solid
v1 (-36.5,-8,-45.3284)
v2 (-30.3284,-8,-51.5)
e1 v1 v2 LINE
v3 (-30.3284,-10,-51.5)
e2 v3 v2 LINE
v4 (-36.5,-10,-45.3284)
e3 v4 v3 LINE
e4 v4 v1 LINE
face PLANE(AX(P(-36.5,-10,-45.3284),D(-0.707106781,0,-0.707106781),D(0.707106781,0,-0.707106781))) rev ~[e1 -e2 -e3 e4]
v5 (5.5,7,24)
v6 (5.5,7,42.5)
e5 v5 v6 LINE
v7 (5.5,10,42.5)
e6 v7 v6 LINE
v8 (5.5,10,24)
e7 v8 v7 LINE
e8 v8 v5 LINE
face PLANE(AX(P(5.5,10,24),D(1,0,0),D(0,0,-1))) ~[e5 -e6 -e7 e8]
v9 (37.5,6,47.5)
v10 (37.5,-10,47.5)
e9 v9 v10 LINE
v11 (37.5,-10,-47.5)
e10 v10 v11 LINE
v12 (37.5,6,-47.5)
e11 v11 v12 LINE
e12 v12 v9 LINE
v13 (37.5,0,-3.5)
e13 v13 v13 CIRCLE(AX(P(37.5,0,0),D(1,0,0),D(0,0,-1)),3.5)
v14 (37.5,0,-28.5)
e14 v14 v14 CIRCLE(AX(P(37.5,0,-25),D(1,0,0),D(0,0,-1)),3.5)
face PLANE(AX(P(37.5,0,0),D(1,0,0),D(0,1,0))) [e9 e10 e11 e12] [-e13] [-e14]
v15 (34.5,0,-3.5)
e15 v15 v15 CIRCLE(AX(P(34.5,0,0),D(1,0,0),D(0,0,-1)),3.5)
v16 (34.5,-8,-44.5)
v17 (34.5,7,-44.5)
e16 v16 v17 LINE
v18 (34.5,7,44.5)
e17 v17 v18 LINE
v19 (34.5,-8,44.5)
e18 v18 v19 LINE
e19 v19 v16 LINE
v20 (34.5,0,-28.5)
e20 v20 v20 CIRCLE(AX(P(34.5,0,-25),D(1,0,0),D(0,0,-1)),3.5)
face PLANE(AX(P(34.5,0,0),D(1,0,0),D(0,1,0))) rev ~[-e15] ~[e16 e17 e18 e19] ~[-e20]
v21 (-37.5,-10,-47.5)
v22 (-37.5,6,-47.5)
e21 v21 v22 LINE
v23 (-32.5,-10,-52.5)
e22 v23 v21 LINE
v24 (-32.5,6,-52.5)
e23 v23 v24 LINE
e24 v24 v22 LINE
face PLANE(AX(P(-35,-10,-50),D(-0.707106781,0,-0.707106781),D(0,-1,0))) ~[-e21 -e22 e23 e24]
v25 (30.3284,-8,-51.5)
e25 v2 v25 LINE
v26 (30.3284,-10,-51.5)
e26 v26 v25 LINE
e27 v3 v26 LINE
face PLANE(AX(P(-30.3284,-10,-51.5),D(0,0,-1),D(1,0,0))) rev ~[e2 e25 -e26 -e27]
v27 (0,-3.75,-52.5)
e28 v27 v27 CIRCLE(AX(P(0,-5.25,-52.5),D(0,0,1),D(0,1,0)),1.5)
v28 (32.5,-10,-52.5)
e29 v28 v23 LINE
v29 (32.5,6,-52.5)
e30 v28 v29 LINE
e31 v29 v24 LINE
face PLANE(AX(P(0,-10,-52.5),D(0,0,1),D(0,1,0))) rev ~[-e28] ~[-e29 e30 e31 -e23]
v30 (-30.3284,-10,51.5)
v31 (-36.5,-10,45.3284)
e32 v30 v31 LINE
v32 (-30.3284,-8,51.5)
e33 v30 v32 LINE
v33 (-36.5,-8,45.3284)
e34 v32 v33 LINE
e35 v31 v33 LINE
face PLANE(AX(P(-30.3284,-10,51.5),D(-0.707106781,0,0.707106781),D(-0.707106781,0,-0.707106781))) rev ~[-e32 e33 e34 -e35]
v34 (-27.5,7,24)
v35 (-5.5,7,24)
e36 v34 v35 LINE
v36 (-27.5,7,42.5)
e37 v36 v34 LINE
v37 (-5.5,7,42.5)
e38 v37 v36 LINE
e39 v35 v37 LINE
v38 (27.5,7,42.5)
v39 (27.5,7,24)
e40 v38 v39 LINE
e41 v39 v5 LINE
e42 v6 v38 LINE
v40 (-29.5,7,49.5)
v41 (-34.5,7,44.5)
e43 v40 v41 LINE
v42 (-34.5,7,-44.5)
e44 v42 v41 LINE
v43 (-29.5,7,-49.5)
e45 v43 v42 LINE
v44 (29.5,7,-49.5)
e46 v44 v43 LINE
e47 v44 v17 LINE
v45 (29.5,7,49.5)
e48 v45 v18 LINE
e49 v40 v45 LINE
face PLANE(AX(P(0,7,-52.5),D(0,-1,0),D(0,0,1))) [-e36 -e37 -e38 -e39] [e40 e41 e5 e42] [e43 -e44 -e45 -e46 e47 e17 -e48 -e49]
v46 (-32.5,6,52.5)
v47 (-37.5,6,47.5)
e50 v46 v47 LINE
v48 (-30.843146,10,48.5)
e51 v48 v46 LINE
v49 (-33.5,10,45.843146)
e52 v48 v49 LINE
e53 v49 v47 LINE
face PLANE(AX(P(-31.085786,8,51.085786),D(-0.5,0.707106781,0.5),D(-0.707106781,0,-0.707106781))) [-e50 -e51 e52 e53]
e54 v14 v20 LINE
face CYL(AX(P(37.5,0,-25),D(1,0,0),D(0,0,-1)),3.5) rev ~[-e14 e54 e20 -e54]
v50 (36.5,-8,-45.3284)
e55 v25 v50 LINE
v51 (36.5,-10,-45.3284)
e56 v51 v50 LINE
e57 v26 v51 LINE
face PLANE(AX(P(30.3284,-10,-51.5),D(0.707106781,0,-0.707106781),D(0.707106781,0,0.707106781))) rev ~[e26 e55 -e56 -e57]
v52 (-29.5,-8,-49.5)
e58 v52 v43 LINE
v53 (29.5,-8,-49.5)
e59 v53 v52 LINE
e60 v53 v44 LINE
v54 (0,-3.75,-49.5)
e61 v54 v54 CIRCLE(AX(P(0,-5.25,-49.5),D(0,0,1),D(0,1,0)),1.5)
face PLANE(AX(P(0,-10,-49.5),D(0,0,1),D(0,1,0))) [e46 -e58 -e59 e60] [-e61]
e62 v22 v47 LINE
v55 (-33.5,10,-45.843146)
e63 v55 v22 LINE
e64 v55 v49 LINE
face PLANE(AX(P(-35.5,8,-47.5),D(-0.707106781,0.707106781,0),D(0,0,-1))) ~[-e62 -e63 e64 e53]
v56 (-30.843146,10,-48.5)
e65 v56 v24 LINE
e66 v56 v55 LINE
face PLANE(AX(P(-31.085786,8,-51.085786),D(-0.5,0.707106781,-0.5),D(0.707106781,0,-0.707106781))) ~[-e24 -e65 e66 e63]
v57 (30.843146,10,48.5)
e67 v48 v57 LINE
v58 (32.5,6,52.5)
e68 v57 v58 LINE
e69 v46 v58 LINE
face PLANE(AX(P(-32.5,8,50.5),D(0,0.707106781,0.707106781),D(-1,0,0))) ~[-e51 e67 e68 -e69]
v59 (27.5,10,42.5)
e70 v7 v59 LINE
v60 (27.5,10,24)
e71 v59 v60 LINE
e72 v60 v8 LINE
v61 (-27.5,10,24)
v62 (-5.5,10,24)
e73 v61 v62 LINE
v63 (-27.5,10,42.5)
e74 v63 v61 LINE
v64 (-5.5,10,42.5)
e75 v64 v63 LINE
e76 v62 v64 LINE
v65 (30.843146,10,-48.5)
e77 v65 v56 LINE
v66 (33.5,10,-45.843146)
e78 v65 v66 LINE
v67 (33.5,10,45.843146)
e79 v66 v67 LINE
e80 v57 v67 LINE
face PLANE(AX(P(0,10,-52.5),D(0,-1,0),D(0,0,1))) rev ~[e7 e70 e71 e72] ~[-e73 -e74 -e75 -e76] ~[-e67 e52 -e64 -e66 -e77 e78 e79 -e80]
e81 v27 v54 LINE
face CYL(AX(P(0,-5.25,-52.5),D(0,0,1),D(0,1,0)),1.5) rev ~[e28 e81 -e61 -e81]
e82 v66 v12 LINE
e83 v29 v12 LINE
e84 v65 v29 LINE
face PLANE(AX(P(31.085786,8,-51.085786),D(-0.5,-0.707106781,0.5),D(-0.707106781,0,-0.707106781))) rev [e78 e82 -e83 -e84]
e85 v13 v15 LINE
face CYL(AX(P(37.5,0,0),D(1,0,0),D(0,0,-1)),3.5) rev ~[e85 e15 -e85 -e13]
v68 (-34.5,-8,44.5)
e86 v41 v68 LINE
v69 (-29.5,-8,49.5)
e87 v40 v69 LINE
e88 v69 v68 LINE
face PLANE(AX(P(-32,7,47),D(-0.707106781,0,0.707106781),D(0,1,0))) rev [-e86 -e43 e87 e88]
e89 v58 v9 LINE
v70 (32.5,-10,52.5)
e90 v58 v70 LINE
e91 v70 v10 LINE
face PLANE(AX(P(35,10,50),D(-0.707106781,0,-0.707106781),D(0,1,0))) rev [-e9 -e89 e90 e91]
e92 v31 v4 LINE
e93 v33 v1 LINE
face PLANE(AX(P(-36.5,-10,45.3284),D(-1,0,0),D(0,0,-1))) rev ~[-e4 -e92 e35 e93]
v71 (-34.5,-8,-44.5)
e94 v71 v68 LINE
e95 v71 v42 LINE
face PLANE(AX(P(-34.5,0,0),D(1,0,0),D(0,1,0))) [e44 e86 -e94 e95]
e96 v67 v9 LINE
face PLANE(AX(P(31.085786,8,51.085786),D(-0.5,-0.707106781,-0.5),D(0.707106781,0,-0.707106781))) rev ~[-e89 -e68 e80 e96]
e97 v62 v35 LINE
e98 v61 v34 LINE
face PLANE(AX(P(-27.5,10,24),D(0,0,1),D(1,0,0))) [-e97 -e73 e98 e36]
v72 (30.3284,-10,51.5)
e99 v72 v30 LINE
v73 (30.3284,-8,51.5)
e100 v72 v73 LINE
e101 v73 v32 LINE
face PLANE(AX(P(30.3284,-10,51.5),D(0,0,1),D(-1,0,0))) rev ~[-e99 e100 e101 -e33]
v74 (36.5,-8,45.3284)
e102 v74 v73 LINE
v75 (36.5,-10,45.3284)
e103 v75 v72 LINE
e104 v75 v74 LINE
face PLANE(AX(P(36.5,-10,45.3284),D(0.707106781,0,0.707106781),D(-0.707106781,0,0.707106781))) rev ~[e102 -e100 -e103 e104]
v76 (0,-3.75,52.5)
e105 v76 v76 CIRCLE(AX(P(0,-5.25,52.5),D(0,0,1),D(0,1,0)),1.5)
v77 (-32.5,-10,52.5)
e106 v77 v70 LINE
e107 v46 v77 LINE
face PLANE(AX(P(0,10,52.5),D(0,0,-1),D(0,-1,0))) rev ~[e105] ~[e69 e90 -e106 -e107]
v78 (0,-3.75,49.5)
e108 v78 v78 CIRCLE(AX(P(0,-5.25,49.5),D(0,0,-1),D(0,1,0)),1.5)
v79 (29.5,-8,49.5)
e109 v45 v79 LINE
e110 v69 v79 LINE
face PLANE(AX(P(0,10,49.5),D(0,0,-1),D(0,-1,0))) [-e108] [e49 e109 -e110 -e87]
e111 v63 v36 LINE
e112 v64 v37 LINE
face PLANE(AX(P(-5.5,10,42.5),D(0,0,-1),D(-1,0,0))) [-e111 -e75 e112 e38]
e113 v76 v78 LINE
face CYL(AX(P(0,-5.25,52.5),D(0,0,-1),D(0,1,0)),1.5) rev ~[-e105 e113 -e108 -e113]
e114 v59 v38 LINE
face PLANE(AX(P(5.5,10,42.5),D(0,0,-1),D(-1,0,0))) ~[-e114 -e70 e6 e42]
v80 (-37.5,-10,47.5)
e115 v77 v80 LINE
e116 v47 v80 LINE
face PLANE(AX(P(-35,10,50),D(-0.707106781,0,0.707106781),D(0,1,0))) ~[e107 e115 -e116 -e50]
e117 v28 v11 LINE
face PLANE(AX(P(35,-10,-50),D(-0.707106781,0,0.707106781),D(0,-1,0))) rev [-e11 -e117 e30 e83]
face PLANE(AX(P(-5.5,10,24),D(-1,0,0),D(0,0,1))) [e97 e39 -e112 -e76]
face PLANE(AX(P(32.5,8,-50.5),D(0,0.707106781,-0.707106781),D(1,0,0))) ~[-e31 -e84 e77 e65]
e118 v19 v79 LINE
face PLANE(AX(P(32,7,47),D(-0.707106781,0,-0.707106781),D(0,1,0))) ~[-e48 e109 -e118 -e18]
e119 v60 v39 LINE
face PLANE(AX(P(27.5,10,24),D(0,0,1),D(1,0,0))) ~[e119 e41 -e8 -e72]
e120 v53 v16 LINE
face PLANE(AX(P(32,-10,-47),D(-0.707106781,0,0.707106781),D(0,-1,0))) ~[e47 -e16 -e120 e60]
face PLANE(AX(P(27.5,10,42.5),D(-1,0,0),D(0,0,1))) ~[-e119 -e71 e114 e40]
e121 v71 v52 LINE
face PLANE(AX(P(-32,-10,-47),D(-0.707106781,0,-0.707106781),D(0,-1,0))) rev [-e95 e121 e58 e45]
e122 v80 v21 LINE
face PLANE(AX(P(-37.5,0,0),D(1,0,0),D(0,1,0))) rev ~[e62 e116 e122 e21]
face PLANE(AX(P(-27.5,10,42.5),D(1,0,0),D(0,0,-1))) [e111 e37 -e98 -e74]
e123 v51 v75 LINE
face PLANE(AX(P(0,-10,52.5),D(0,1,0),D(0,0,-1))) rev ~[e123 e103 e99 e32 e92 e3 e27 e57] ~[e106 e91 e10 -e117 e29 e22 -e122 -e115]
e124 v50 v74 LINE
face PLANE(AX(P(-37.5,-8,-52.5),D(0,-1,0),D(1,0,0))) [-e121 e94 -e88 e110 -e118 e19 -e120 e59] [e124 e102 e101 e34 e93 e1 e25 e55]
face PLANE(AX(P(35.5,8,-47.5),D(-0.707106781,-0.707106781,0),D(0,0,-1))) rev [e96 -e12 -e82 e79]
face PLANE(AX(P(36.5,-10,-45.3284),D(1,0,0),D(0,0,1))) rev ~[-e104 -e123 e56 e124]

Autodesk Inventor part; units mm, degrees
ref_plane "YZ Plane" through (0, 0, 0) normal (1, 0, 0) x (0, 1, 0)
ref_plane "XZ Plane" through (0, 0, 0) normal (0, 1, 0) x (-1, 0, 0)
ref_plane "XY Plane" through (0, 0, 0) normal (0, 0, 1) x (1, 0, 0)
sketch "Sketch5" plane through (0, 0, 0) normal (1, 0, 0) x (0, 1, 0)
  line L0 (10, 52.5) -> (-10, 52.5)
  line L1 (-10, 52.5) -> (-10, -52.5)
  line L2 (-10, -52.5) -> (10, -52.5)
  line L3 (10, -52.5) -> (10, 52.5)
  point P0 (0, 0)
  point P1 (10, 0)
  point P2 (0, -52.5)
  dimension "d6" = 20
  dimension "d30" = 105
extrude "Extrusion2" add sketch "Sketch5" along normal mid plane 75
shell "Shell1" thickness 3 removed faces 1 at (-12.5, -10, 17.5)
chamfer "Chamfer4" distance 5 angle 45 8 edges at (37.5, 0, 52.5) (34.5, -1.5, 49.5) (34.5, -1.5, -49.5) (37.5, 0, -52.5) (-37.5, 0, -52.5) (-34.5, -1.5, -49.5) (-37.5, 0, 52.5) (-34.5, -1.5, 49.5)
sketch "Sketch7" plane through (-37.5, -10, -52.5) normal (0, -1, 0) x (1, 0, 0)
  line L0 (3, 8) -> (3, 97) projected
  line L1 (8, 102) -> (67, 102) projected
  line L2 (72, 97) -> (72, 8) projected
  line L3 (67, 3) -> (8, 3) projected
  line L4 (5, 0) -> (70, 0) projected
  line L5 (75, 100) -> (75, 5) projected
  line L6 (5, 105) -> (70, 105) projected
  line L7 (0, 5) -> (0, 100) projected
  line L8 (8, 102) -> (3, 97) projected
  line L9 (72, 97) -> (67, 102) projected
  line L10 (67, 3) -> (72, 8) projected
  line L11 (3, 8) -> (8, 3) projected
  line L12 (0, 100) -> (5, 105) projected
  line L13 (5, 0) -> (0, 5) projected
  line L14 (75, 5) -> (70, 0) projected
  line L15 (70, 105) -> (75, 100) projected
  line L16 (67.8284, 104) -> (7.1716, 104)
  line L17 (7.1716, 104) -> (1, 97.8284)
  line L18 (1, 97.8284) -> (1, 7.1716)
  line L19 (1, 7.1716) -> (7.1716, 1)
  line L20 (7.1716, 1) -> (67.8284, 1)
  line L21 (67.8284, 1) -> (74, 7.1716)
  line L22 (74, 7.1716) -> (74, 97.8284)
  line L23 (74, 97.8284) -> (67.8284, 104)
  dimension "d61" = 2
extrude "Extrusion4" cut sketch "Sketch7" against normal blind 2 contours L23 L22 L21 L20 L19 L18 L17 L16
sketch "Sketch8" plane through (-37.5, 10, 52.5) normal (0, 1, 0) x (1, 0, 0)
  line L0 (32, 10) -> (10, 10)
  line L1 (10, 10) -> (10, 28.5)
  line L2 (10, 28.5) -> (32, 28.5)
  line L3 (32, 28.5) -> (32, 10)
  line L4 (32, 10) -> (10, 28.5) construction
  line L5 (10, 10) -> (32, 28.5) construction
  line L6 (0, 0) -> (0, 105) projected
  line L7 (75, 0) -> (0, 0) projected
  point P0 (37.5, 52.5)
  point P1 (21, 19.25)
  dimension "d35" = 22
  dimension "d36" = 18.5
  dimension "d49" = 10
  dimension "d54" = 10
extrude "Extrusion5" cut sketch "Sketch8" against normal blind 3
mirror "Mirror4" about plane through (0, 0, 0) normal (1, 0, 0) of "Extrusion5"
sketch "Sketch9" plane through (37.5, 0, 0) normal (1, 0, 0) x (0, 0, -1)
  circle A0 centre (0, 0) radius 3.5
  circle A1 centre (0, 0) radius 8.5 construction
  line L0 (-8.5, 0) -> (8.5, 0) construction
  line L1 (8.5, 0) -> (8.5, -13) construction
  line L2 (8.5, -13) -> (-8.5, -13) construction
  line L3 (-8.5, -13) -> (-8.5, 0) construction
  dimension "d43" = 17
  dimension "d41" = 7
  dimension "d45" = 13
  dimension "d46" = 0
extrude "Extrusion6" cut sketch "Sketch9" against normal blind 3
pattern_linear "Rectangular Pattern1" count 2 spacing 25 along (0, 0, -1) of "Extrusion6"
chamfer "Chamfer5" distance 4 angle 45 8 edges at (37.5, 10, 0) (35, 10, 50) (0, 10, 52.5) (-35, 10, 50) (-37.5, 10, 0) (-35, 10, -50) (0, 10, -52.5) (35, 10, -50)
sketch "Sketch10" plane through (32.5, -10, -52.5) normal (0, 0, -1) x (-1, 0, 0)
  line L0 (0, 16) -> (65, 16) projected
  line L1 (0, 0) -> (0, 16) projected
  line L2 (65, 0) -> (0, 0) projected
  line L3 (65, 16) -> (65, 0) projected
  point P0 (32.5, 10)
  point P1 (32.5, 4.75)
  dimension "d65" = 4.75
hole "Hole1" at (0, -5.25, -52.5) direction (0, 0, 1) diameter 3 depth 5
mirror "Mirror5" about plane through (0, 0, 0) normal (0, 0, 1) of "Hole1"
properties part number "Casing-v2-top"
